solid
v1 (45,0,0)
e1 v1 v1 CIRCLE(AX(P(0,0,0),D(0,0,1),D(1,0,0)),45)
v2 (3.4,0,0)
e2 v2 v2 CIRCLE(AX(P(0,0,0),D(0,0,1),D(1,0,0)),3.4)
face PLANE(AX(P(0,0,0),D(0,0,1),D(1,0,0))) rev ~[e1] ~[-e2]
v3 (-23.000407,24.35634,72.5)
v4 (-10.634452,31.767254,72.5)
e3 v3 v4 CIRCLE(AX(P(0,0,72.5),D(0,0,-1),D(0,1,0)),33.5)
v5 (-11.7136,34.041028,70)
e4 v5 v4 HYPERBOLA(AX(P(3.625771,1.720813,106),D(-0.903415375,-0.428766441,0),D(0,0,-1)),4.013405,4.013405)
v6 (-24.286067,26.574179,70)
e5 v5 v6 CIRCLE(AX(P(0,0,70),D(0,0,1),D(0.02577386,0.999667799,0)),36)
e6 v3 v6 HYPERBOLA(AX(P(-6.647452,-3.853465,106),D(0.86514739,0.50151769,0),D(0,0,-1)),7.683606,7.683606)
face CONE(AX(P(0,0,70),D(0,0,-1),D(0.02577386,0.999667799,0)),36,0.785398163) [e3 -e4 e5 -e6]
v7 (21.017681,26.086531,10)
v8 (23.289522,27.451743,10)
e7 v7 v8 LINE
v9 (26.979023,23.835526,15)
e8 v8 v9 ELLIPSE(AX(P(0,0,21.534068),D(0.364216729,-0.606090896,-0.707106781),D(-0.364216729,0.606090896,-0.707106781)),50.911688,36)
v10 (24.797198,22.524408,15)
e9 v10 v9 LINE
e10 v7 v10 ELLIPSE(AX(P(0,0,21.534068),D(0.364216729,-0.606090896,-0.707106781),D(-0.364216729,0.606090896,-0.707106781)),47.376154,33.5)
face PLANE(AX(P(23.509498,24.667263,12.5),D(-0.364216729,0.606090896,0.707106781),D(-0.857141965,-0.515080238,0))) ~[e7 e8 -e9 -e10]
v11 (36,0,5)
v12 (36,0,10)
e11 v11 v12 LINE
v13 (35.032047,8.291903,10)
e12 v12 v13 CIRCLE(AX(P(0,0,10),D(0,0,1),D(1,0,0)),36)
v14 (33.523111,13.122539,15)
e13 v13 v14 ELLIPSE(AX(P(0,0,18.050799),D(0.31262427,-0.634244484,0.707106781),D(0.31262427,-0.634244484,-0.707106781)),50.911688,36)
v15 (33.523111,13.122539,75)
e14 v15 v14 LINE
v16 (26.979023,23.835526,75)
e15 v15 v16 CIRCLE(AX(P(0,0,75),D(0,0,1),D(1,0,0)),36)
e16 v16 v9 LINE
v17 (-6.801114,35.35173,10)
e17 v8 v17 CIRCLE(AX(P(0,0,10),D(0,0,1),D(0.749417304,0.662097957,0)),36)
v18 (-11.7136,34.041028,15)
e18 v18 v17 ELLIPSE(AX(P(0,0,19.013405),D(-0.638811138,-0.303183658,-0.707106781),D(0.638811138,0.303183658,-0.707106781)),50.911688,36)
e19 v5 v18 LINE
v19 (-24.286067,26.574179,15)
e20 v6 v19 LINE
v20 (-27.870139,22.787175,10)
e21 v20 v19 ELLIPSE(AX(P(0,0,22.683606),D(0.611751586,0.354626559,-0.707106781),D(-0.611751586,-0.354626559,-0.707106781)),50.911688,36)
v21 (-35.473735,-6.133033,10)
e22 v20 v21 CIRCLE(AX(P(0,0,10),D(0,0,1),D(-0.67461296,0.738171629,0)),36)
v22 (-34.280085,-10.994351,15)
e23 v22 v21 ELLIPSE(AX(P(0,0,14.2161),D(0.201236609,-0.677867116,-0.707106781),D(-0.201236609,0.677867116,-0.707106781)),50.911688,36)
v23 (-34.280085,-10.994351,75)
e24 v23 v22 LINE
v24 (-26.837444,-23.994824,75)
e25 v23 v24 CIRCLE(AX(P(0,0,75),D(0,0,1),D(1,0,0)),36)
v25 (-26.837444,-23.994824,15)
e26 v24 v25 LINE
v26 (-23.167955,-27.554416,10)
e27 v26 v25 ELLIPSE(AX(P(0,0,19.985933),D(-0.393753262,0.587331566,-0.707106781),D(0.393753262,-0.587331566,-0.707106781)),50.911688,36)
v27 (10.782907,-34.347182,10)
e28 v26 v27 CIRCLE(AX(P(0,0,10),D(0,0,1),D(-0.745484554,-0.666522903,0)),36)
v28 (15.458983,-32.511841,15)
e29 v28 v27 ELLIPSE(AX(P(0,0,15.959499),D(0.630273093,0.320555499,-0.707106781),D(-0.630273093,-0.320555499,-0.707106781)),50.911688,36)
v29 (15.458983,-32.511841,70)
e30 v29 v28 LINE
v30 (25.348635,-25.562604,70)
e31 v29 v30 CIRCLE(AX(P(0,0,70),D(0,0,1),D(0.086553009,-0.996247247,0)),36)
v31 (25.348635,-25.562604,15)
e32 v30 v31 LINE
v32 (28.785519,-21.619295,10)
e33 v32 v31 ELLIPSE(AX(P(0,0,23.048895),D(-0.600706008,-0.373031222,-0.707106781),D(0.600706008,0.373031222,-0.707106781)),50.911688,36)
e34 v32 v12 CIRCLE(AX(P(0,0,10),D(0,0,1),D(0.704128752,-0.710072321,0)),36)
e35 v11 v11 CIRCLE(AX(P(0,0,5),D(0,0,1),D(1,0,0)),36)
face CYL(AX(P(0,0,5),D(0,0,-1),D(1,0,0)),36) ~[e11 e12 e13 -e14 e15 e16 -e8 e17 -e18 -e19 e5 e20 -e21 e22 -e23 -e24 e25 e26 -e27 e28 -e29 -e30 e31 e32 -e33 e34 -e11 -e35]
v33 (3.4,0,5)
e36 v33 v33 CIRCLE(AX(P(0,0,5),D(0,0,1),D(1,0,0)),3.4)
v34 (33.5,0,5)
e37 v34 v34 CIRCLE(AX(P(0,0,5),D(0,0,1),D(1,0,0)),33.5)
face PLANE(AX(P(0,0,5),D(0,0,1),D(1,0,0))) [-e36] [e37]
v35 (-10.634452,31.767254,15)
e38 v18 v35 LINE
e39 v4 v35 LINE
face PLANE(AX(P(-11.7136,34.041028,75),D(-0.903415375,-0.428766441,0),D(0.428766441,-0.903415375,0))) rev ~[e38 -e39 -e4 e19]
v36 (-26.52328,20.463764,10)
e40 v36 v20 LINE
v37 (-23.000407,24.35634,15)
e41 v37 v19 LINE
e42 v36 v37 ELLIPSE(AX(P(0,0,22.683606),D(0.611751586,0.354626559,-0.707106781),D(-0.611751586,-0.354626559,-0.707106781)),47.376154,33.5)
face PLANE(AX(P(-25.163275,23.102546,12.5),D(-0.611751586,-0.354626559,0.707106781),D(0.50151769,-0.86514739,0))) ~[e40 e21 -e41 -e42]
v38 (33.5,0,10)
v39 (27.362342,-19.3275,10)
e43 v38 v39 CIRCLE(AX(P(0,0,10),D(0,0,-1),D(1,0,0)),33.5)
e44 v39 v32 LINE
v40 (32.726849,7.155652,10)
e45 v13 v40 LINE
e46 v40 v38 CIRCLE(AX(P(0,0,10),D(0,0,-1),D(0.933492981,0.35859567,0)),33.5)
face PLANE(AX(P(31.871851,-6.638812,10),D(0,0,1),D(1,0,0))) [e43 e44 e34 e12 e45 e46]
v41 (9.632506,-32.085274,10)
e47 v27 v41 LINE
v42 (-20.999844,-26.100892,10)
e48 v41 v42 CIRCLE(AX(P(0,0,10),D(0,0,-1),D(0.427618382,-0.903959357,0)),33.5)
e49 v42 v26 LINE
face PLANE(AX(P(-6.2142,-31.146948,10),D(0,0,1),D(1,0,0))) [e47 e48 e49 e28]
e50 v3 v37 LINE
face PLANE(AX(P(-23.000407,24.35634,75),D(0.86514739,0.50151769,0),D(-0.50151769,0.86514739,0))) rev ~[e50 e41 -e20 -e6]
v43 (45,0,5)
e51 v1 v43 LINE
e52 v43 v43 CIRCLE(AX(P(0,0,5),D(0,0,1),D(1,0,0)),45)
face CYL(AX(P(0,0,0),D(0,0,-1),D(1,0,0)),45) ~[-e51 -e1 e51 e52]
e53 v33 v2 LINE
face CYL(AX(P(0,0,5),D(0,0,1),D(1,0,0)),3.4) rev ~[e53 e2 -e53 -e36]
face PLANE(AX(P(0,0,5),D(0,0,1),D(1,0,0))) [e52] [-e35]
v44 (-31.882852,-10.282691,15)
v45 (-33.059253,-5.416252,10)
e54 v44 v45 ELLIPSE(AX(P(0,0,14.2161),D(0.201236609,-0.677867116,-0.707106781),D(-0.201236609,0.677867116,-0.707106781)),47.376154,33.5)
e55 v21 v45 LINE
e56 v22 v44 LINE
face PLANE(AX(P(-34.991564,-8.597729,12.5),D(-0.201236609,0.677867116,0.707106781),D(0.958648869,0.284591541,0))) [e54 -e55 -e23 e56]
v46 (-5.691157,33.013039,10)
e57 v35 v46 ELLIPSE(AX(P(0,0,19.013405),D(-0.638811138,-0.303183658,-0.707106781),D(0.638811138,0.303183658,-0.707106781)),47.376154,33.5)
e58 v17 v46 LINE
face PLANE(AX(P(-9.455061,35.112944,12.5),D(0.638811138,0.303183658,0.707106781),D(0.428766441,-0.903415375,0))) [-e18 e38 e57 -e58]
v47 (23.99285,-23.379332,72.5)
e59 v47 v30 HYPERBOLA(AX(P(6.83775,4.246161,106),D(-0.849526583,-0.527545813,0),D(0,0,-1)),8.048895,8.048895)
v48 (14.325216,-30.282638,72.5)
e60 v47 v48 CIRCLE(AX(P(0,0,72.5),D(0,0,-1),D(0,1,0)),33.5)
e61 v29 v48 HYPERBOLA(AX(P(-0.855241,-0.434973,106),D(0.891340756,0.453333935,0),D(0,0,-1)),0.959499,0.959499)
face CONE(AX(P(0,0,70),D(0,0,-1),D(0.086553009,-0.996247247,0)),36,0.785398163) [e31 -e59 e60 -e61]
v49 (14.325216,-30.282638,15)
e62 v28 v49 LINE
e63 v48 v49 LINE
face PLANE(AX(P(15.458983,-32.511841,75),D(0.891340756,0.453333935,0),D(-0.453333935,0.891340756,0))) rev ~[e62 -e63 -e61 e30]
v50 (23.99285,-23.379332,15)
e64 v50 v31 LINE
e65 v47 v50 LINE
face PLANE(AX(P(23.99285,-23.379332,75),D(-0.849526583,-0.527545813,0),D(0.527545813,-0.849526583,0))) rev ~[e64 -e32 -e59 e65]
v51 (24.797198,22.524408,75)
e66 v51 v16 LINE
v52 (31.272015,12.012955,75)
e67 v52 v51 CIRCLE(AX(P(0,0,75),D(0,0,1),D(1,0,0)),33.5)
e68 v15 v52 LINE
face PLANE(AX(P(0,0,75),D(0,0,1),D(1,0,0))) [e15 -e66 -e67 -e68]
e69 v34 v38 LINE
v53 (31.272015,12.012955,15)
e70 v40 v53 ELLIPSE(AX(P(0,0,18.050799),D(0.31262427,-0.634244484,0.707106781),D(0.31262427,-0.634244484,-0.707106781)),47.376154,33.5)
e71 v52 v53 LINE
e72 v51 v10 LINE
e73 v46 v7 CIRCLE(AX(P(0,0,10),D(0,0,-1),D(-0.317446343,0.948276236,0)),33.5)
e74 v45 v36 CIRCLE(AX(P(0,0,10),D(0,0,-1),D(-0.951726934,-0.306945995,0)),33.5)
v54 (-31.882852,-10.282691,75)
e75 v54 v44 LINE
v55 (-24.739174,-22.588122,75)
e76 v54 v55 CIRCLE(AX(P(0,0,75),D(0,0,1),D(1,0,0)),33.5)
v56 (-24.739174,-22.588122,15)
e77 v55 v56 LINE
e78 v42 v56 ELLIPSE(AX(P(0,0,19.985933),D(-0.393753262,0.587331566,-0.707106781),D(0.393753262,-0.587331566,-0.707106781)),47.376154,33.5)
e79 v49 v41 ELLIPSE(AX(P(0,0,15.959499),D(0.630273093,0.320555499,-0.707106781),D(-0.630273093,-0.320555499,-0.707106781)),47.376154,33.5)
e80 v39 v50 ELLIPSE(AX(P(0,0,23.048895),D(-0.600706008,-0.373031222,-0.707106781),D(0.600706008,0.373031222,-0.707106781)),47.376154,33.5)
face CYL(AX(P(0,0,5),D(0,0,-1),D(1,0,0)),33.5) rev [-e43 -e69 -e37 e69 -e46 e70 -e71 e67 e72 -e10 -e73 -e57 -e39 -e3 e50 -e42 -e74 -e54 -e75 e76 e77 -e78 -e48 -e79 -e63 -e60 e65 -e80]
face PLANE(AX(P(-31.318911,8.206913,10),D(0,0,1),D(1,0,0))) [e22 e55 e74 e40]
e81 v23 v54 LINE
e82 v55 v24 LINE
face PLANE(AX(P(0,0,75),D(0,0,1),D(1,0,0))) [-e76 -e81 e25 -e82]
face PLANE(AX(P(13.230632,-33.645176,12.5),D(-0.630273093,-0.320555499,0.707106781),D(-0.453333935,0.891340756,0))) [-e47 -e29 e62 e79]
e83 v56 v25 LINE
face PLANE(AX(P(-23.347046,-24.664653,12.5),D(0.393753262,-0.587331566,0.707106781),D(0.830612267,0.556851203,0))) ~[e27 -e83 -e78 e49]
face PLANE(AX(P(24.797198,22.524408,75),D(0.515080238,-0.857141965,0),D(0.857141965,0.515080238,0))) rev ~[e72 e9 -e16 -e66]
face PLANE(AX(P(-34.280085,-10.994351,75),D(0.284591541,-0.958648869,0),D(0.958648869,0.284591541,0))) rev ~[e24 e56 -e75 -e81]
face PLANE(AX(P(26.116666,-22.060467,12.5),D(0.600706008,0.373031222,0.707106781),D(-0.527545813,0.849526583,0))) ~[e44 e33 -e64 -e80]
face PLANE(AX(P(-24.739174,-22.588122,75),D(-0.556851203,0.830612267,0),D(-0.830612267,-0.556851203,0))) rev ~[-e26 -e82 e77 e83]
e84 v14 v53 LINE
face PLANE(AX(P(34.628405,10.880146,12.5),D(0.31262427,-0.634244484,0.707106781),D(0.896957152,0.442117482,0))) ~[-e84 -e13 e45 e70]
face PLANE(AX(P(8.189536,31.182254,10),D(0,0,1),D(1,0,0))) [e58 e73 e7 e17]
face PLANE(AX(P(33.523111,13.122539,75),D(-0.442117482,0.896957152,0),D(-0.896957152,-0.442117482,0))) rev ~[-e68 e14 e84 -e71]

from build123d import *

# Parameters (mm, degrees)
F0_R        = 45
F1_DEPTH    = 5
F2_R        = 36
F2_R_2      = 33.5
F3_DEPTH    = 70
F5_DEPTH    = 65
F6_R        = 3.4
F7_DEPTH    = 5.001
F8_T2_ANGLE = 64.3663587264
F8_T4_ANGLE = 60.259047326
F9_SIZE     = 5


# Not quite as in the source:
# - a fillet or chamfer that OpenCascade refuses, or shapes differently, is made with other operations: its cross-section is extruded or revolved along the edge and cut away or added


with BuildPart() as f1:
    # F0 (on Top) → F1 (new body)
    with BuildSketch(Plane.XY):
        Circle(F0_R)
    extrude(amount=F1_DEPTH)

    # F2 (on face) → F3 (join)
    with BuildSketch(Plane.XY.offset(5)):
        Circle(F2_R)
        Circle(F2_R_2, mode=Mode.SUBTRACT)
    extrude(amount=F3_DEPTH)

    # F4 (on face) → F5 (cut)
    with BuildSketch(Plane.XY.offset(75)):
        with BuildLine():
            Line((-23.0004066086, 24.3563399516), (-24.2860665521, 26.5741786595))
            ThreePointArc((-24.2860665521, 26.5741786595), (-34.7900436906, 9.2548830357), (-34.2800852695, -10.9943510002))
            Line((-34.2800852695, -10.9943510002), (-31.8828522812, -10.2826908158))
            ThreePointArc((-31.8828522812, -10.2826908158), (-32.4500946026, 8.321139362), (-23.0004066086, 24.3563399516))
        make_face()
        with BuildLine():
            ThreePointArc((26.9790229265, 23.8355264664), (9.1813045472, 34.8095338494), (-11.7135995274, 34.0410279826))
            Line((-11.7135995274, 34.0410279826), (-10.6344524928, 31.7672538973))
            ThreePointArc((-10.6344524928, 31.7672538973), (8.4559678958, 32.4152218401), (24.7971983706, 22.5244079383))
            Line((24.7971983706, 22.5244079383), (26.9790229265, 23.8355264664))
        make_face()
        with BuildLine():
            ThreePointArc((36, 0), (35.3753586598, 6.6771251068), (33.5231111282, 13.1225386373))
            Line((33.5231111282, 13.1225386373), (31.2720148564, 12.012954958))
            ThreePointArc((31.2720148564, 12.012954958), (32.9382945649, 6.1089075256), (33.5, 0))
            ThreePointArc((33.5, 0), (31.0323255924, -12.619222176), (23.9928496521, -23.3793320173))
            Line((23.9928496521, -23.3793320173), (25.3486350697, -25.562603547))
            ThreePointArc((25.3486350697, -25.562603547), (33.2306399465, -13.8464641243), (36, 0))
        make_face()
        with BuildLine():
            Line((-24.739174036, -22.5881222774), (-26.8374439413, -23.9948244982))
            ThreePointArc((-26.8374439413, -23.9948244982), (-7.1064924362, -35.2916104089), (15.4589834804, -32.5118413775))
            Line((15.4589834804, -32.5118413775), (14.3252158119, -30.2826384574))
            ThreePointArc((14.3252158119, -30.2826384574), (-6.4741042843, -32.8684647301), (-24.739174036, -22.5881222774))
        make_face()
    extrude(amount=-F5_DEPTH, mode=Mode.SUBTRACT)

    # F6 (on face) → F7 (cut, through all)
    with BuildSketch(Plane.XY.offset(5)):
        Circle(F6_R)
    extrude(amount=-F7_DEPTH, mode=Mode.SUBTRACT)

    # F8: chamfer of 5 on 2 edges, made by hand

    # F8_s1 → F8_t2 (revolve, cut)
    with BuildSketch(Plane(origin=(0, 0, 0), x_dir=(0, 0, 1), z_dir=(0.9996677989, -0.0257738601, 0))):
        Polygon((70, -36), (75, -31), (75, -36), align=None)
    revolve(axis=Axis((0, 0, 75), (0, 0, 1)), revolution_arc=F8_T2_ANGLE, mode=Mode.SUBTRACT)

    # F8_s3 → F8_t4 (revolve, cut)
    with BuildSketch(Plane(origin=(0, 0, 0), x_dir=(0, 0, 1), z_dir=(-0.9962472468, -0.0865530086, 0))):
        Polygon((70, -36), (75, -31), (75, -36), align=None)
    revolve(axis=Axis((0, 0, 75), (0, 0, 1)), revolution_arc=F8_T4_ANGLE, mode=Mode.SUBTRACT)

    # F9
    f9_edges = [f1.edges().sort_by_distance(p)[0] for p in [
        (-23.643237, 25.465259, 10),
        (-11.174026, 32.904141, 10),
        (25.888111, 23.179967, 10),
        (32.397563, 12.567747, 10),
        (24.670742, -24.470968, 10),
        (14.8921, -31.39724, 10),
        (-25.788309, -23.291473, 10),
        (-33.081469, -10.638521, 10),
    ]]
    chamfer(f9_edges, length=F9_SIZE)


solid = f1.part
